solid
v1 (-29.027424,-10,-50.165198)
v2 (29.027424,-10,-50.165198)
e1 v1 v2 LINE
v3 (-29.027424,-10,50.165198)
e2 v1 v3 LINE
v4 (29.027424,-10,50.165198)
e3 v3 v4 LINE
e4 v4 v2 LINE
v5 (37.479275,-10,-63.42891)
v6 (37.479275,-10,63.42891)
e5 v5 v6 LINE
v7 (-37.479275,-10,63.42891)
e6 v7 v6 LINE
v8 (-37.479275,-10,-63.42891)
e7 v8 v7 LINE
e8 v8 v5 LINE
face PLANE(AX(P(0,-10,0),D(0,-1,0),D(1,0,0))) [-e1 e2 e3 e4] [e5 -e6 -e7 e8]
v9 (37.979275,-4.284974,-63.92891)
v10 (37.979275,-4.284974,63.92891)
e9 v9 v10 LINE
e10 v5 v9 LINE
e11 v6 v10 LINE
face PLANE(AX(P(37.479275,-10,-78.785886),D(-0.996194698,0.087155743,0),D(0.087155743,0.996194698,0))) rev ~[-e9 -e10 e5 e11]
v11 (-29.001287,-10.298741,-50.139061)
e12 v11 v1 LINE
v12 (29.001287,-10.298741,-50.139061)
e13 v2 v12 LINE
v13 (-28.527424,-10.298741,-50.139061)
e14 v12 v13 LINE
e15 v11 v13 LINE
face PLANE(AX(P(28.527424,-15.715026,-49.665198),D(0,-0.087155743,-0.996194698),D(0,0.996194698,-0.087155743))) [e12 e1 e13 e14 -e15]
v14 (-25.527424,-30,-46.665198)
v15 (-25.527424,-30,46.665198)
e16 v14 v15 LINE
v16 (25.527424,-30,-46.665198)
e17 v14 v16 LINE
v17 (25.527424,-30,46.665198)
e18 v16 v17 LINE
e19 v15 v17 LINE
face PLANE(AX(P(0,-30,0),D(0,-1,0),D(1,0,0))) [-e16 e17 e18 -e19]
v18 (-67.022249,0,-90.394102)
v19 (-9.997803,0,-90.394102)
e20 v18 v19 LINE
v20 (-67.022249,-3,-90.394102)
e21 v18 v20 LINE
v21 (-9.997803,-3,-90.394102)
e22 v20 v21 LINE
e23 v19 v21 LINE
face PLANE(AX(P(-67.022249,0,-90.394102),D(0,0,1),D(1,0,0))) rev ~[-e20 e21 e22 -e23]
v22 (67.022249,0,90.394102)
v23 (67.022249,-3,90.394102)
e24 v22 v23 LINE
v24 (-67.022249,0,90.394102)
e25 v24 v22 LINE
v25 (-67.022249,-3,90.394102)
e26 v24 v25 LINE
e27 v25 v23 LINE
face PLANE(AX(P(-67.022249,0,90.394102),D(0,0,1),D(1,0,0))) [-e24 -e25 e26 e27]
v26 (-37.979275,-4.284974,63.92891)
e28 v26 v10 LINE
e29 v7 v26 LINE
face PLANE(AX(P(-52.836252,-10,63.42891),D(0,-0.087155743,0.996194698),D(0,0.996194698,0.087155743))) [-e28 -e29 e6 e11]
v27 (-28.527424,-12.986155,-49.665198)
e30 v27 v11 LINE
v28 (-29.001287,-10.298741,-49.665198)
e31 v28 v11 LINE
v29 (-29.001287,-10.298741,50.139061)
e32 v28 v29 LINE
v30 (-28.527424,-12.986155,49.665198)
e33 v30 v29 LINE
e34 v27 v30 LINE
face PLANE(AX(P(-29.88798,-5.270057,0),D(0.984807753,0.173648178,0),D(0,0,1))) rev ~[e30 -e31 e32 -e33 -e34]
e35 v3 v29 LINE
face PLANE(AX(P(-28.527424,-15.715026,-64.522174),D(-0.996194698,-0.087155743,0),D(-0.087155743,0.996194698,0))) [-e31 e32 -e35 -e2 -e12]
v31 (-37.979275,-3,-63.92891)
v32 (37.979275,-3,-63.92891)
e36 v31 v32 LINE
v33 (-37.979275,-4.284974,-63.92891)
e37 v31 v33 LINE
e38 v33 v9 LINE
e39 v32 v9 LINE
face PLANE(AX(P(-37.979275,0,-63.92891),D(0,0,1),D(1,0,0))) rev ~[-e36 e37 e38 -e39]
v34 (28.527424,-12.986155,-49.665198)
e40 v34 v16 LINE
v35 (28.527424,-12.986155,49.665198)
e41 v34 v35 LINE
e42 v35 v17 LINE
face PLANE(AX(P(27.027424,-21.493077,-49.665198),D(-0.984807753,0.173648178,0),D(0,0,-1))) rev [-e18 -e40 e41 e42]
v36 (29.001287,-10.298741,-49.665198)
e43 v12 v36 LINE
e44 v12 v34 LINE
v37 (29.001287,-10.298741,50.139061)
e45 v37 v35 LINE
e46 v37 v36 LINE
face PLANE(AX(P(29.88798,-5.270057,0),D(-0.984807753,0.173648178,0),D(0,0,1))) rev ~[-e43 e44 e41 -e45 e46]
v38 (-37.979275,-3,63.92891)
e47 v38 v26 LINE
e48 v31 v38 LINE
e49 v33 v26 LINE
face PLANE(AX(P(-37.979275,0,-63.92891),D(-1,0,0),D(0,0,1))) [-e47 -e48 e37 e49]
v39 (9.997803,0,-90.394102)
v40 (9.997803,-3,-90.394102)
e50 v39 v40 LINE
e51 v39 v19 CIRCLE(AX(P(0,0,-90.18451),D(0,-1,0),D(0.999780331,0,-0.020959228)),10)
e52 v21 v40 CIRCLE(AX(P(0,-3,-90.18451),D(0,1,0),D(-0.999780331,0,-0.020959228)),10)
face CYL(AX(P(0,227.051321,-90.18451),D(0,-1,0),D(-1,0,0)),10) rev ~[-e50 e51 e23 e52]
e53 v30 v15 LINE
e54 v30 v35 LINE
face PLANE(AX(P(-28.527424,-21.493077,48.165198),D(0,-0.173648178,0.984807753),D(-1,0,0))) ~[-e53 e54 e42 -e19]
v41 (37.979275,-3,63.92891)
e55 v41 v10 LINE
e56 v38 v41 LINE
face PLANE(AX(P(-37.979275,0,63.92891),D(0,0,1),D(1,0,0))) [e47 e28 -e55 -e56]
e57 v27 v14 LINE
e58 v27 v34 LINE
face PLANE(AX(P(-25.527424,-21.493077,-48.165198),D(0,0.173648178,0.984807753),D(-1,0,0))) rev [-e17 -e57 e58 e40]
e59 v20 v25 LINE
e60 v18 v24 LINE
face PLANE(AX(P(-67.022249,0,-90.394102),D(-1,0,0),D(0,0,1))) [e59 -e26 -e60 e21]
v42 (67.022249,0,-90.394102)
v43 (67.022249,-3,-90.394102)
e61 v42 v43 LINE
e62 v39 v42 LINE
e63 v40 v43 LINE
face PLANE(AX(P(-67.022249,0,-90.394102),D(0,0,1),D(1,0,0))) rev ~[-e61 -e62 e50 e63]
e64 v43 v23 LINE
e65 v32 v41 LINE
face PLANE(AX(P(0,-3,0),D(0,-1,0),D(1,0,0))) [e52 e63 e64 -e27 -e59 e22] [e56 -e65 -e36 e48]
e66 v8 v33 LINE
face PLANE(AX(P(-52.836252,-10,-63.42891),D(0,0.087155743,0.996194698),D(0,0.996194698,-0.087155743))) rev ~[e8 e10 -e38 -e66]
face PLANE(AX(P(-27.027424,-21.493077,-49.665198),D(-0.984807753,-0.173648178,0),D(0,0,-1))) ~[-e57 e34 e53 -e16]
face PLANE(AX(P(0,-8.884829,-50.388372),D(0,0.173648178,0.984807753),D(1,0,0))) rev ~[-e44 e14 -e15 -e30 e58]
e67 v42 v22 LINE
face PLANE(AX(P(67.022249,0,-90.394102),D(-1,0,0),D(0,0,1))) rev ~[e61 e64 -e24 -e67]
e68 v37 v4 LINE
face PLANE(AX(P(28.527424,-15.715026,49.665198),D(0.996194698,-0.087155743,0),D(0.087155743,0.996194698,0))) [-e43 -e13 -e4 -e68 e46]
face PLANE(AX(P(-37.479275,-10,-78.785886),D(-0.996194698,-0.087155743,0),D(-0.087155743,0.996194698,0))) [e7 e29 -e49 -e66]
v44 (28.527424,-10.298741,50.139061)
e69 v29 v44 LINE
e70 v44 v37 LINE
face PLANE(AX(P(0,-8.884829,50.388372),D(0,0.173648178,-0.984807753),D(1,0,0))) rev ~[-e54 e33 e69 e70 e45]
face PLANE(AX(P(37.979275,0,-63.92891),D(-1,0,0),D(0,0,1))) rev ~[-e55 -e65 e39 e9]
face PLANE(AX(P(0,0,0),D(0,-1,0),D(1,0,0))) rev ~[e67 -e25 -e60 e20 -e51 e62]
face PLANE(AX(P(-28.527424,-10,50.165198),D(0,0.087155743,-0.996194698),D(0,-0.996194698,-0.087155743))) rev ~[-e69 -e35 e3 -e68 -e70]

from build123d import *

# Parameters (mm, degrees)
F0_W         = 57.0548474789
F0_H         = 99.3303954601
F1_DEPTH     = 30
F0_W_2       = 75.9585499763
F0_H_2       = 127.8578191996
F2_DEPTH     = 10
F3_C1_SIZE2  = 3
F3_C1_SIZE   = 17.0138454589
F3_C2_SIZE2  = 3
F3_C2_SIZE   = 17.0138454589
F3_C3_SIZE2  = 3
F3_C3_SIZE   = 17.0138454589
F3_C4_SIZE2  = 3
F3_C4_SIZE   = 17.0138454589
F4_T4_DEPTH  = 57.0548474789
F4_T9_DEPTH  = 99.3303954601
F4_T14_DEPTH = 57.0548474789
F4_T19_DEPTH = 99.3303954601
F4_T25_DEPTH = 114.1873722104
F4_T31_DEPTH = 71.9118242292
F4_T40_DEPTH = 114.1873722104
F4_T46_DEPTH = 71.9118242292
F4_T55_DEPTH = 71.9118242292
F4_T61_DEPTH = 114.1873722104
F4_T70_DEPTH = 71.9118242292
F4_T76_DEPTH = 114.1873722104
F4_T81_DEPTH = 157.5717727001
F4_T83_DEPTH = 105.6725034769
F0_W_3       = 134.0444982052
F0_H_3       = 180.7882040739
F5_DEPTH     = 3
F7_D         = 20


# Not quite as in the source:
# - a fillet or chamfer that OpenCascade refuses, or shapes differently, is made with other operations: its cross-section is extruded or revolved along the edge and cut away or added


with BuildPart() as f1:
    # F0 (on Front) → F1 (new body)
    with BuildSketch(Plane.XZ):
        Rectangle(F0_W, F0_H)
    extrude(amount=F1_DEPTH)

    # F0 (on Front) → F2 (join)
    with BuildSketch(Plane.XZ):
        Rectangle(F0_W_2, F0_H_2)
        Rectangle(F0_W, F0_H, mode=Mode.SUBTRACT)
    extrude(amount=F2_DEPTH)

    # F3: chamfer of 3 x 17.0138454589 on 4 edges, made by hand

    # F3_c1
    f3_c1_edges = [f1.edges().sort_by_distance(p)[0] for p in [
        (28.5274237394, -30, 0),
    ]]
    f3_c1_side = f1.faces().sort_by_distance((28.5274237394, -29.94, 0))[0]
    chamfer(f3_c1_edges, length=F3_C1_SIZE, length2=F3_C1_SIZE2, reference=f3_c1_side)

    # F3_c2
    f3_c2_edges = [f1.edges().sort_by_distance(p)[0] for p in [
        (-1.5, -30, 49.6651977301),
    ]]
    f3_c2_side = f1.faces().sort_by_distance((-1.5, -29.94, 49.6651977301))[0]
    chamfer(f3_c2_edges, length=F3_C2_SIZE, length2=F3_C2_SIZE2, reference=f3_c2_side)

    # F3_c3
    f3_c3_edges = [f1.edges().sort_by_distance(p)[0] for p in [
        (-28.5274237394, -30, -1.5),
    ]]
    f3_c3_side = f1.faces().sort_by_distance((-28.5274237394, -29.94, -1.5))[0]
    chamfer(f3_c3_edges, length=F3_C3_SIZE, length2=F3_C3_SIZE2, reference=f3_c3_side)

    # F3_c4
    f3_c4_edges = [f1.edges().sort_by_distance(p)[0] for p in [
        (0, -30, -49.6651977301),
    ]]
    f3_c4_side = f1.faces().sort_by_distance((0, -29.94, -49.6651977301))[0]
    chamfer(f3_c4_edges, length=F3_C4_SIZE, length2=F3_C4_SIZE2, reference=f3_c4_side)

    # F4: chamfer of 0.5 x 5.7150261514 on 8 edges, made by hand


with BuildPart() as f4_tool2:
    # F4_s3 → F4_t4 (new body)
    with BuildSketch(Plane.YZ.offset(-28.5274237394)):
        Polygon((-10, 50.1651977301), (-15.7150261514, 49.6651977301), (-10, 49.6651977301), align=None)
    extrude(amount=F4_T4_DEPTH)

    split(bisect_by=Plane(origin=(0, -8.8848294962, 50.3883719921), x_dir=(1, 0, 0), z_dir=(0, 0.1736481777, -0.984807753)), keep=Keep.TOP)


with BuildPart() as f1_1:
    add(f1.part)

    # F4_t1: union F4_tool2
    add(f4_tool2.part)


with BuildPart() as f4_tool7:
    # F4_s8 → F4_t9 (new body)
    with BuildSketch(Plane.XY.offset(49.6651977301)):
        Polygon((28.5274237394, -15.7150261514), (29.0274237394, -10), (28.5274237394, -10), align=None)
    extrude(amount=-F4_T9_DEPTH)

    split(bisect_by=Plane(origin=(29.8879798774, -5.2700572513, 0), x_dir=(0, 0, 1), z_dir=(-0.984807753, 0.1736481777, 0)), keep=Keep.TOP)


with BuildPart() as f1_2:
    add(f1_1.part)

    # F4_t6: union F4_tool7
    add(f4_tool7.part)


with BuildPart() as f4_tool12:
    # F4_s13 → F4_t14 (new body)
    with BuildSketch(Plane.YZ.offset(28.5274237394)):
        Polygon((-15.7150261514, -49.6651977301), (-10, -50.1651977301), (-10, -49.6651977301), align=None)
    extrude(amount=-F4_T14_DEPTH)

    split(bisect_by=Plane(origin=(0, -8.8848294962, -50.3883719921), x_dir=(1, 0, 0), z_dir=(0, 0.1736481777, 0.984807753)), keep=Keep.TOP)


with BuildPart() as f1_3:
    add(f1_2.part)

    # F4_t11: union F4_tool12
    add(f4_tool12.part)


with BuildPart() as f4_tool17:
    # F4_s18 → F4_t19 (new body)
    with BuildSketch(Plane.XY.offset(-49.6651977301)):
        Polygon((-28.5274237394, -15.7150261514), (-29.0274237394, -10), (-28.5274237394, -10), align=None)
    extrude(amount=F4_T19_DEPTH)

    split(bisect_by=Plane(origin=(-29.8879798774, -5.2700572513, 0), x_dir=(0, 0, 1), z_dir=(0.984807753, 0.1736481777, 0)), keep=Keep.TOP)


with BuildPart() as f1_4:
    add(f1_3.part)

    # F4_t16: union F4_tool17
    add(f4_tool17.part)


with BuildPart() as f4_tool23:
    # F4_s24 → F4_t25 (new body)
    with BuildSketch(Plane.XY.offset(-49.6651977301)):
        Polygon((-28.5274237394, -15.7150261514), (-29.0274237394, -10), (-28.5274237394, -10), align=None)
    extrude(amount=F4_T25_DEPTH)

    split(bisect_by=Plane(origin=(-29.8879798774, -5.2700572513, 0), x_dir=(0, 0, 1), z_dir=(0.984807753, 0.1736481777, 0)), keep=Keep.TOP)

    split(bisect_by=Plane.XY.offset(49.6651977301), keep=Keep.TOP)

    split(bisect_by=Plane.XY.offset(63.9289095998), keep=Keep.BOTTOM)


with BuildPart() as f4_tool29:
    # F4_s30 → F4_t31 (new body)
    with BuildSketch(Plane.YZ.offset(-43.3844004897)):
        Polygon((-10, 50.1651977301), (-15.7150261514, 49.6651977301), (-10, 49.6651977301), align=None)
    extrude(amount=F4_T31_DEPTH)

    split(bisect_by=Plane.YZ.offset(-28.5274237394), keep=Keep.BOTTOM)

    split(bisect_by=Plane.YZ.offset(-37.9792749882), keep=Keep.TOP)

    split(bisect_by=Plane(origin=(0, -8.8848294962, 50.3883719921), x_dir=(1, 0, 0), z_dir=(0, 0.1736481777, -0.984807753)), keep=Keep.TOP)


with BuildPart() as f4_tool23_1:
    add(f4_tool23.part)

    # F4_t35: intersect F4_tool29
    add(f4_tool29.part, mode=Mode.INTERSECT)


with BuildPart() as f1_5:
    add(f1_4.part)

    # F4_t21: union F4_tool23
    add(f4_tool23_1.part)


with BuildPart() as f4_tool38:
    # F4_s39 → F4_t40 (new body)
    with BuildSketch(Plane.XY.offset(64.5221744803)):
        Polygon((28.5274237394, -15.7150261514), (29.0274237394, -10), (28.5274237394, -10), align=None)
    extrude(amount=-F4_T40_DEPTH)

    split(bisect_by=Plane.XY.offset(49.6651977301), keep=Keep.TOP)

    split(bisect_by=Plane(origin=(29.8879798774, -5.2700572513, 0), x_dir=(0, 0, 1), z_dir=(-0.984807753, 0.1736481777, 0)), keep=Keep.TOP)

    split(bisect_by=Plane.XY.offset(63.9289095998), keep=Keep.BOTTOM)


with BuildPart() as f4_tool44:
    # F4_s45 → F4_t46 (new body)
    with BuildSketch(Plane.YZ.offset(-28.5274237394)):
        Polygon((-10, 50.1651977301), (-15.7150261514, 49.6651977301), (-10, 49.6651977301), align=None)
    extrude(amount=F4_T46_DEPTH)

    split(bisect_by=Plane.YZ.offset(28.5274237394), keep=Keep.TOP)

    split(bisect_by=Plane.YZ.offset(37.9792749882), keep=Keep.BOTTOM)

    split(bisect_by=Plane(origin=(0, -8.8848294962, 50.3883719921), x_dir=(1, 0, 0), z_dir=(0, 0.1736481777, -0.984807753)), keep=Keep.TOP)


with BuildPart() as f4_tool38_1:
    add(f4_tool38.part)

    # F4_t50: intersect F4_tool44
    add(f4_tool44.part, mode=Mode.INTERSECT)


with BuildPart() as f1_6:
    add(f1_5.part)

    # F4_t36: union F4_tool38
    add(f4_tool38_1.part)


with BuildPart() as f4_tool53:
    # F4_s54 → F4_t55 (new body)
    with BuildSketch(Plane.YZ.offset(43.3844004897)):
        Polygon((-15.7150261514, -49.6651977301), (-10, -50.1651977301), (-10, -49.6651977301), align=None)
    extrude(amount=-F4_T55_DEPTH)

    split(bisect_by=Plane(origin=(0, -8.8848294962, -50.3883719921), x_dir=(1, 0, 0), z_dir=(0, 0.1736481777, 0.984807753)), keep=Keep.TOP)

    split(bisect_by=Plane.YZ.offset(28.5274237394), keep=Keep.TOP)

    split(bisect_by=Plane.YZ.offset(37.9792749882), keep=Keep.BOTTOM)


with BuildPart() as f4_tool59:
    # F4_s60 → F4_t61 (new body)
    with BuildSketch(Plane.XY.offset(49.6651977301)):
        Polygon((28.5274237394, -15.7150261514), (29.0274237394, -10), (28.5274237394, -10), align=None)
    extrude(amount=-F4_T61_DEPTH)

    split(bisect_by=Plane.XY.offset(-49.6651977301), keep=Keep.BOTTOM)

    split(bisect_by=Plane(origin=(29.8879798774, -5.2700572513, 0), x_dir=(0, 0, 1), z_dir=(-0.984807753, 0.1736481777, 0)), keep=Keep.TOP)

    split(bisect_by=Plane.XY.offset(-63.9289095998), keep=Keep.TOP)


with BuildPart() as f4_tool53_1:
    add(f4_tool53.part)

    # F4_t65: intersect F4_tool59
    add(f4_tool59.part, mode=Mode.INTERSECT)


with BuildPart() as f1_7:
    add(f1_6.part)

    # F4_t51: union F4_tool53
    add(f4_tool53_1.part)


with BuildPart() as f4_tool68:
    # F4_s69 → F4_t70 (new body)
    with BuildSketch(Plane.YZ.offset(28.5274237394)):
        Polygon((-15.7150261514, -49.6651977301), (-10, -50.1651977301), (-10, -49.6651977301), align=None)
    extrude(amount=-F4_T70_DEPTH)

    split(bisect_by=Plane(origin=(0, -8.8848294962, -50.3883719921), x_dir=(1, 0, 0), z_dir=(0, 0.1736481777, 0.984807753)), keep=Keep.TOP)

    split(bisect_by=Plane.YZ.offset(-28.5274237394), keep=Keep.BOTTOM)

    split(bisect_by=Plane.YZ.offset(-37.9792749882), keep=Keep.TOP)


with BuildPart() as f4_tool74:
    # F4_s75 → F4_t76 (new body)
    with BuildSketch(Plane.XY.offset(-64.5221744803)):
        Polygon((-28.5274237394, -15.7150261514), (-29.0274237394, -10), (-28.5274237394, -10), align=None)
    extrude(amount=F4_T76_DEPTH)

    split(bisect_by=Plane.XY.offset(-49.6651977301), keep=Keep.BOTTOM)

    split(bisect_by=Plane(origin=(-29.8879798774, -5.2700572513, 0), x_dir=(0, 0, 1), z_dir=(0.984807753, 0.1736481777, 0)), keep=Keep.TOP)

    split(bisect_by=Plane.XY.offset(-63.9289095998), keep=Keep.TOP)


with BuildPart() as f4_tool68_1:
    add(f4_tool68.part)

    # F4_t80: intersect F4_tool74
    add(f4_tool74.part, mode=Mode.INTERSECT)


with BuildPart() as f1_8:
    add(f1_7.part)

    # F4_t66: union F4_tool68
    add(f4_tool68_1.part)

    # F4_s82 → F4_t81 (cut)
    with BuildSketch(Plane.XY.offset(-78.7858863501)):
        Polygon((37.4792749882, -10), (37.9792749882, -4.2849738486), (37.9792749882, -10), align=None)
        Polygon((-37.4792749882, -10), (-37.9792749882, -4.2849738486), (-37.9792749882, -10), align=None)
    extrude(amount=F4_T81_DEPTH, mode=Mode.SUBTRACT)

    # F4_s84 → F4_t83 (cut)
    with BuildSketch(Plane.YZ.offset(-52.8362517385)):
        Polygon((-10, 63.4289095998), (-4.2849738486, 63.9289095998), (-10, 63.9289095998), align=None)
        Polygon((-10, -63.4289095998), (-4.2849738486, -63.9289095998), (-10, -63.9289095998), align=None)
    extrude(amount=F4_T83_DEPTH, mode=Mode.SUBTRACT)

    # F0 (on Front) → F5 (join)
    with BuildSketch(Plane.XZ):
        Rectangle(F0_W_3, F0_H_3)
        Rectangle(F0_W_2, F0_H_2, mode=Mode.SUBTRACT)
    extrude(amount=F5_DEPTH)

    # F7 (through all)
    with Locations(Plane(origin=(0, 0, 0), x_dir=(1, 0, 0), z_dir=(0, 1, 0))):
        with Locations((0, 90.1845097542)):
            Hole(F7_D / 2)


solid = f1_8.part
